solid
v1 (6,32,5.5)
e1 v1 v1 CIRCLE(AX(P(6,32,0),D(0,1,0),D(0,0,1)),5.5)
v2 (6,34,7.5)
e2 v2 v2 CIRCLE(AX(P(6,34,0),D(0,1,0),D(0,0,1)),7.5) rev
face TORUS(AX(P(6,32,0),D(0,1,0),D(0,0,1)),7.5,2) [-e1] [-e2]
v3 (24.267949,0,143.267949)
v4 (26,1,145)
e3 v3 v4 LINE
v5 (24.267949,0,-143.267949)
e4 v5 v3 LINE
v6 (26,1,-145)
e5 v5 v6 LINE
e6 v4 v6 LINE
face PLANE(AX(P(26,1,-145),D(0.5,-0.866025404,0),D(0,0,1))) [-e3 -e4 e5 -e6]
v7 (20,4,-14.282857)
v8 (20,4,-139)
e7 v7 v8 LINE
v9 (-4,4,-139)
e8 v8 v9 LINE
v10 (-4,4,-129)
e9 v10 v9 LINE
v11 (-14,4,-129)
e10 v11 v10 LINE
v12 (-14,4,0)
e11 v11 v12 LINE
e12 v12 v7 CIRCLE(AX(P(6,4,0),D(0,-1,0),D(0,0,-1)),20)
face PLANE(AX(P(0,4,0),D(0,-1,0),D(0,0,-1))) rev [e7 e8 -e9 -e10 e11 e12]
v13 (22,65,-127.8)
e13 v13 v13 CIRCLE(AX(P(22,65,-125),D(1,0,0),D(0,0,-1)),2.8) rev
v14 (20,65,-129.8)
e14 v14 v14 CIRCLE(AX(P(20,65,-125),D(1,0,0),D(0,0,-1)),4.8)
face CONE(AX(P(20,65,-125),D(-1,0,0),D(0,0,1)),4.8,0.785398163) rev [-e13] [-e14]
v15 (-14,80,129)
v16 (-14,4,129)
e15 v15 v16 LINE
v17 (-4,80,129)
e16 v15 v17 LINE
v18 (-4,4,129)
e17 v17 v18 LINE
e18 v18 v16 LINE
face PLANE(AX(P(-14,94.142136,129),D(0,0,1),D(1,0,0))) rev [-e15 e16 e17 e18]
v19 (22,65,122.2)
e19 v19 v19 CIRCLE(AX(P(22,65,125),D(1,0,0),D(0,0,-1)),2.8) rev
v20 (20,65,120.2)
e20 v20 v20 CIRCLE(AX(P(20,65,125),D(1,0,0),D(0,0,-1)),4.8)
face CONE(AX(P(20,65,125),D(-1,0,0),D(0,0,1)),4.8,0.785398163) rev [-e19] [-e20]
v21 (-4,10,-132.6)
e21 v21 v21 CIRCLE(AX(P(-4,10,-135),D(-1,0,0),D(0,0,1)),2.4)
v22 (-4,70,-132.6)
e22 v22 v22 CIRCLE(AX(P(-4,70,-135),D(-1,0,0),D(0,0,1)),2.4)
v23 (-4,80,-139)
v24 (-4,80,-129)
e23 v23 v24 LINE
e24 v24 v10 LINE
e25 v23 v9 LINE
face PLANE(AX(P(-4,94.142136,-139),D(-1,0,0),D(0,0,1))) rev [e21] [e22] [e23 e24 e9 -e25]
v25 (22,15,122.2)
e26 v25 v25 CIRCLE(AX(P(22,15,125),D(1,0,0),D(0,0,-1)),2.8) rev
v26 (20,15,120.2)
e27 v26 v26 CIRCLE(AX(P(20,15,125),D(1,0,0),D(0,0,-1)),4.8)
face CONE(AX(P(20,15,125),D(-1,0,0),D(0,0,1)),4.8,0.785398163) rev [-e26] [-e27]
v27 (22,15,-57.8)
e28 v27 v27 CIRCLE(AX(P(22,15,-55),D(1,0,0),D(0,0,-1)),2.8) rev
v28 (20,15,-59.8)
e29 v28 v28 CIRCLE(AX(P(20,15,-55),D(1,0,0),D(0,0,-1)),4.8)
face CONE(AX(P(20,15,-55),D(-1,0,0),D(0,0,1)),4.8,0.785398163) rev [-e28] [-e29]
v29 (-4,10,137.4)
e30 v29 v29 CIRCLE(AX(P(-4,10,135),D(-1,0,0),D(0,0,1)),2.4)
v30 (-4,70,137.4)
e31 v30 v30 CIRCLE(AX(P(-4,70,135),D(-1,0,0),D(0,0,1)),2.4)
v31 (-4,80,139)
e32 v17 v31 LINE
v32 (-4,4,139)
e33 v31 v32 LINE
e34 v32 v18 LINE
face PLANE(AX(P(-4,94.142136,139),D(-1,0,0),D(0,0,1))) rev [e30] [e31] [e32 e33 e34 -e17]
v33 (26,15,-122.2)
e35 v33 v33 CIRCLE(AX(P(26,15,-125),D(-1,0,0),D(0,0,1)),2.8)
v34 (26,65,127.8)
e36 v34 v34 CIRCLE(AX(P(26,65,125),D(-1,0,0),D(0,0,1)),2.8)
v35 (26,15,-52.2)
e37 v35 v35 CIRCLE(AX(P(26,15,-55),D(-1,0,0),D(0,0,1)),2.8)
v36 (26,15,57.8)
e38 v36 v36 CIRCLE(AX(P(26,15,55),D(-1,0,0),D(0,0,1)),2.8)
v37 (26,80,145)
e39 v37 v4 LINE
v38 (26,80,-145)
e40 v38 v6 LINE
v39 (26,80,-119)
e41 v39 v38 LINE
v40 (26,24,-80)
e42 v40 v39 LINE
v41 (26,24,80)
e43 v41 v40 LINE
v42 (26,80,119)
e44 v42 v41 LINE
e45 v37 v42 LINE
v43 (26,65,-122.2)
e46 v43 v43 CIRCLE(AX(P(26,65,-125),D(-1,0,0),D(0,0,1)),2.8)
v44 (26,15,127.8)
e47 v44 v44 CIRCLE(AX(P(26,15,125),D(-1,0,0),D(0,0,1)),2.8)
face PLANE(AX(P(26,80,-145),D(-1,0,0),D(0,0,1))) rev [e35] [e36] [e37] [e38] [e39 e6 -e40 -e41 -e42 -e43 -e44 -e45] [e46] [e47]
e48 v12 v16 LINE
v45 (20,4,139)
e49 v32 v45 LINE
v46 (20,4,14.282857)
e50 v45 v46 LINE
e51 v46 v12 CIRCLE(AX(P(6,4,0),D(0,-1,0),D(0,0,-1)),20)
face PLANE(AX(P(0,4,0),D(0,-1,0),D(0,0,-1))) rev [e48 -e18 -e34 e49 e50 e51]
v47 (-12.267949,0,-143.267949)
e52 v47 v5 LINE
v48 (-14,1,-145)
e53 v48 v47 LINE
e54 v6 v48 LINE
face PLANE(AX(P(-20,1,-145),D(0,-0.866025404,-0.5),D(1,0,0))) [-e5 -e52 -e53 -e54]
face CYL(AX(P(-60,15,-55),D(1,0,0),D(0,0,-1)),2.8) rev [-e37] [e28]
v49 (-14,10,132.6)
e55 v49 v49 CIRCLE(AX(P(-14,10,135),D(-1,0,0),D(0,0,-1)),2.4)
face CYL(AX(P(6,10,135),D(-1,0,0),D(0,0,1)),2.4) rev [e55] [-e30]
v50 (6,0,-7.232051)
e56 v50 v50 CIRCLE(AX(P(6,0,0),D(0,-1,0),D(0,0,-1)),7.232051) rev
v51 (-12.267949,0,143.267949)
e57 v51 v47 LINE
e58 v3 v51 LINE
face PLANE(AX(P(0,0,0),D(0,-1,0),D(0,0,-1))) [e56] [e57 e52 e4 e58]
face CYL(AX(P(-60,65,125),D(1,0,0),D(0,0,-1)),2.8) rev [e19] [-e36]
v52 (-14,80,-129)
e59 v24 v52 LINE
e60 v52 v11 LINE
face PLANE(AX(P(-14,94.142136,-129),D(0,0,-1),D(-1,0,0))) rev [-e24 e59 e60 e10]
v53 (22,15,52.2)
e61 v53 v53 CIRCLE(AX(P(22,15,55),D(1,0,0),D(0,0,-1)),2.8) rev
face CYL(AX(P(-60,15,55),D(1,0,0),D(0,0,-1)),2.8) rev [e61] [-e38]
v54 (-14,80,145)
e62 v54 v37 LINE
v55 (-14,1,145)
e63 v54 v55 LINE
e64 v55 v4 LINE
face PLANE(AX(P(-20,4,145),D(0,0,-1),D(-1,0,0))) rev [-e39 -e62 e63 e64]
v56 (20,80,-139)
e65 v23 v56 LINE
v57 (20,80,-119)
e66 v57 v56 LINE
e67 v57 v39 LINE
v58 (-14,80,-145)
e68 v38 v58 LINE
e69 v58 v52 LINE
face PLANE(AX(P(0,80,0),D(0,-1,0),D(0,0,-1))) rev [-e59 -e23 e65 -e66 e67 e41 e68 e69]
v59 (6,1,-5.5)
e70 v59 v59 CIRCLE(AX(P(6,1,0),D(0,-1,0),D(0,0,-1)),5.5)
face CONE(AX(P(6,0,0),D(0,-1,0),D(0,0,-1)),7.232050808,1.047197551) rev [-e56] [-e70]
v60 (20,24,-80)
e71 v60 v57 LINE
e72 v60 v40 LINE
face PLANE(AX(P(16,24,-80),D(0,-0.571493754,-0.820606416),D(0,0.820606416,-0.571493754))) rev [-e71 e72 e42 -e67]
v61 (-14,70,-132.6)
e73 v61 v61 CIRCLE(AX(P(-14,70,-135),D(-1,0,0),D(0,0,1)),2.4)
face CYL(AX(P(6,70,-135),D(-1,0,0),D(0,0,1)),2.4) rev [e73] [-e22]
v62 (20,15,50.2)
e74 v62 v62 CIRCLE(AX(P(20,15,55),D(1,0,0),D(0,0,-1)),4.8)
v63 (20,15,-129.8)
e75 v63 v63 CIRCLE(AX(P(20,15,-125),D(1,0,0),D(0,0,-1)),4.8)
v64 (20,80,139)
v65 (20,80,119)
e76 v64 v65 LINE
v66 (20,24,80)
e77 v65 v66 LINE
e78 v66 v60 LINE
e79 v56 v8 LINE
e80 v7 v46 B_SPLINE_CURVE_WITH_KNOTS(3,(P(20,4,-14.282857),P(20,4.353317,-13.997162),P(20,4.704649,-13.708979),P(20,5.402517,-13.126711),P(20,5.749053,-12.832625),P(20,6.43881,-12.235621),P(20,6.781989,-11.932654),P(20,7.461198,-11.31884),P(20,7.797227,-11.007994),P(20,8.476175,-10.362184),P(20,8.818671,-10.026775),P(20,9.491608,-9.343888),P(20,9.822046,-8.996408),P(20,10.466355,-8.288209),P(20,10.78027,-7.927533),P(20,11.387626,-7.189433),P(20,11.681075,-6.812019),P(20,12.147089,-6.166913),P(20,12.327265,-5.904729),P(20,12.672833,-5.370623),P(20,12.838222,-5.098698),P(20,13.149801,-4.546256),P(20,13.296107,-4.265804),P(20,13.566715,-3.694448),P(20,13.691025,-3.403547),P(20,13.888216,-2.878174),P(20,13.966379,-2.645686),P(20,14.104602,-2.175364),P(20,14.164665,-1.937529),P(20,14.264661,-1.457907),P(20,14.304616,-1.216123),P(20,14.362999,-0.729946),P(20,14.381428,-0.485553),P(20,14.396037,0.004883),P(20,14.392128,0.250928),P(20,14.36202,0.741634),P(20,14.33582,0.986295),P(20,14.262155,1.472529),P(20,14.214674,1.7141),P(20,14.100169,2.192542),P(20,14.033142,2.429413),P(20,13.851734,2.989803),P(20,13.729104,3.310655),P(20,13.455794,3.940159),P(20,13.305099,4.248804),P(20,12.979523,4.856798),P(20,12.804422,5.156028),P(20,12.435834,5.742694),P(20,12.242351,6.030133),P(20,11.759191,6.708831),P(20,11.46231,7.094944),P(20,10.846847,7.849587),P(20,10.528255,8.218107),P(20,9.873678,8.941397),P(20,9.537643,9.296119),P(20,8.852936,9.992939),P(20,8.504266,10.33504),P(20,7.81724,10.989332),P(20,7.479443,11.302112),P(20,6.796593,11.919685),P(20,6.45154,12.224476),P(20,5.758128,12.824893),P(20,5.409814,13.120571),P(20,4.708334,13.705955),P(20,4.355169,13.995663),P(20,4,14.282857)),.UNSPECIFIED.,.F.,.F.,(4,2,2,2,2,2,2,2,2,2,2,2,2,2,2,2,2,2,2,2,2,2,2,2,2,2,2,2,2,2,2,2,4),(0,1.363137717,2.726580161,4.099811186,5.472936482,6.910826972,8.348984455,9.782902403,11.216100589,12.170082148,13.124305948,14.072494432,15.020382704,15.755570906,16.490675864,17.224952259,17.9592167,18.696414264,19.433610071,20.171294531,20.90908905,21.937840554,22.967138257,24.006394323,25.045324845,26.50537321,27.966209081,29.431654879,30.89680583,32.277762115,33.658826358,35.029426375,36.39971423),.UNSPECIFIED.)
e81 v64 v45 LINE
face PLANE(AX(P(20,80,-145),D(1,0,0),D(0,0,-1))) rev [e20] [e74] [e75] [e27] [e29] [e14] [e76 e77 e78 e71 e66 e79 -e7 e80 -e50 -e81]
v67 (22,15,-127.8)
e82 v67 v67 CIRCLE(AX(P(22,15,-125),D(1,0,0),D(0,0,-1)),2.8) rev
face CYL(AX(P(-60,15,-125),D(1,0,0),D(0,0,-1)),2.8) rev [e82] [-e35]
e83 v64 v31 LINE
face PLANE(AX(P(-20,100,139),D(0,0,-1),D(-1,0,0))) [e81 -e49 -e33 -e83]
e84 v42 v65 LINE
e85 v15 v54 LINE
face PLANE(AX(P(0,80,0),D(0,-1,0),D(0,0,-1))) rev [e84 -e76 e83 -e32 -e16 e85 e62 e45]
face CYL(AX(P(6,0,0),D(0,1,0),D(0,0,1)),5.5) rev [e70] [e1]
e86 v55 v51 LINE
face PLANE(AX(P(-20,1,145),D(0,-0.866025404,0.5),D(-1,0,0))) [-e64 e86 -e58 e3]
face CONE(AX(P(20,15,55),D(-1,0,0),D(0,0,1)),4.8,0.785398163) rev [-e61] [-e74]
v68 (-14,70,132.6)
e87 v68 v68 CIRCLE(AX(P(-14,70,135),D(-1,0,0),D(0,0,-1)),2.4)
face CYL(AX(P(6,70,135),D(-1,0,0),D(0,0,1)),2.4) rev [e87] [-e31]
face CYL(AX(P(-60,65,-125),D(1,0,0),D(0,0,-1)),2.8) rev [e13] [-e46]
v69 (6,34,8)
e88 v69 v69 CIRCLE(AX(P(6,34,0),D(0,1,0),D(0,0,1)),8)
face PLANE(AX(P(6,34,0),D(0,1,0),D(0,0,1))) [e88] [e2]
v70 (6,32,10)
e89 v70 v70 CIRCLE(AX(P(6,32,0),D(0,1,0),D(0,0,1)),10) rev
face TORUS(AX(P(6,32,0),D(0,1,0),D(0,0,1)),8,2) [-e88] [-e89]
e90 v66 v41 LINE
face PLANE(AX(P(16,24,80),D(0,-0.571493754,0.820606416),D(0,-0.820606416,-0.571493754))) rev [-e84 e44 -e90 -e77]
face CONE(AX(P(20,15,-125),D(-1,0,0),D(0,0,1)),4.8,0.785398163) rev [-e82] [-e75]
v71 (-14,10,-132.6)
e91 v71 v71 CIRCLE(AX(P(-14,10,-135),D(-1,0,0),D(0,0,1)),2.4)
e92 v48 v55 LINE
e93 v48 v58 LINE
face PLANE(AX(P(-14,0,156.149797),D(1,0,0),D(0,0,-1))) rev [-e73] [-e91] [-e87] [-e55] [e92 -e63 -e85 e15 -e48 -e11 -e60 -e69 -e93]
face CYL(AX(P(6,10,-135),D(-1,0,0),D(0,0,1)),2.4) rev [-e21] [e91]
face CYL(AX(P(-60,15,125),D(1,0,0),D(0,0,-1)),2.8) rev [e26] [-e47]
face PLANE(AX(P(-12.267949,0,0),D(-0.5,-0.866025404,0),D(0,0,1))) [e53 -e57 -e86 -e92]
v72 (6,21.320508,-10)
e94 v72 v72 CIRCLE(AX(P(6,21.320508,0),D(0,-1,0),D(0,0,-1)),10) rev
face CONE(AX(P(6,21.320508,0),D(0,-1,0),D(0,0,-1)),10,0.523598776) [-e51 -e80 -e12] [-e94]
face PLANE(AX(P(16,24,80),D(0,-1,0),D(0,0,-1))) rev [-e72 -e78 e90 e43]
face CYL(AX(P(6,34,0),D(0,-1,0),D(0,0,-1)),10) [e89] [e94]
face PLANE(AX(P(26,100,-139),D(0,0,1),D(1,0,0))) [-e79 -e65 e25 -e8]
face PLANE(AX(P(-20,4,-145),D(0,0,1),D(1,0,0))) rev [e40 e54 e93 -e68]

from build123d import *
from OCP.BRepFilletAPI import BRepFilletAPI_MakeChamfer

# Parameters (mm, degrees)
EXTRUDE_1_DEPTH           = 4
SKETCH_2_W                = 6
SKETCH_2_H                = 290
EXTRUDE_2_DEPTH           = 80
EXTRUDE_1_2_DEPTH         = 96
SKETCH_29_W               = 8
SKETCH_29_H               = 100
EXTRUDE_5_DEPTH           = 96
SKETCH_20_W               = 6
SKETCH_20_H               = 7.125217771
SKETCH_20_W_2             = 7.125217771
SKETCH_20_H_2             = 6
SKETCH_20_H_3             = 7.251760651
SKETCH_20_W_3             = 7.251760651
CUT_EXTRUDE_7_DEPTH       = 2
CUT_EXTRUDE_6_DEPTH       = 197.012754687
CUT_EXTRUDE_6_DEPTH_BACK  = 197.012754687
SKETCH_16_R               = 2.8
SKETCH_21_R               = 2
LED_DEPTH                 = 10
SKETCH_22_W               = 46
SKETCH_22_H               = 290
CUT_EXTRUDE_9_DEPTH       = 20
FILLET_3_R                = 30
SKETCH_23_W               = 30
SKETCH_23_H               = 6
EXTRUDE_3_DEPTH           = 10
SKETCH_24_W               = 30
SKETCH_24_H               = 6
EXTRUDE_4_DEPTH           = 10
CHAMFER_1_SIZE            = 10
CUT_EXTRUDE_10_DEPTH      = 10
CHAMFER_2_SIZE            = 2
SKETCH_30_R               = 1.9
CUT_EXTRUDE_11_DEPTH      = 7
SKETCH_32_R               = 1.9
CUT_EXTRUDE_13_DEPTH      = 7
CHAMFER_3_SIZE            = 2
CHAMFER_4_SIZE            = 2
CHAMFER_5_SIZE            = 2
SKETCH_33_R               = 10
EXTRUDE_6_DEPTH           = 30
CHAMFER_6_SIZE            = 10
CHAMFER_6_SIZE_2          = 17.320508076
CUT_EXTRUDE_14_DEPTH      = 171.238068672
CUT_EXTRUDE_14_DEPTH_BACK = 171.238068672
SKETCH_34_R               = 5.5
FILLET_4_R                = 2
CUT_EXTRUDE_15_DEPTH      = 187.077940745
CUT_EXTRUDE_15_DEPTH_BACK = 187.077940745
SKETCH_35_W               = 74.138767557
SKETCH_35_H               = 312.299593446
SKETCH_36_W               = 10
SKETCH_36_H               = 10
EXTRUDE_7_DEPTH           = 76
SKETCH_37_R               = 2.4
CUT_EXTRUDE_16_DEPTH      = 20
CHAMFER_7_SIZE            = 1
CHAMFER_7_SIZE2           = 1.732050808


# Some blends are built 0.0001 mm under size
with BuildPart() as part:
    # Эскиз1 → Extrude 1 (new body)
    with BuildSketch(Plane(origin=(0, 0, 0), x_dir=(1, 0, 0), z_dir=(0, 1, 0))):
        Polygon((-60, -50), (-60, 50), (-20, 145), (20, 145), (20, -145), (-20, -145), align=None)
    extrude(amount=EXTRUDE_1_DEPTH)

    # Эскиз2 → Бобышка-Вытянуть2 (add)
    with BuildSketch(Plane(origin=(0, 0, 0), x_dir=(1, 0, 0), z_dir=(0, 1, 0))):
        with Locations((23, 0)):
            Rectangle(SKETCH_2_W, SKETCH_2_H)
    extrude(amount=EXTRUDE_2_DEPTH)

    # Эскиз17 → Extrude 1 2 (add)
    with BuildSketch(Plane(origin=(0, 4, 0), x_dir=(1, 0, 0), z_dir=(0, 1, 0))):
        Polygon((-20, 145), (-60, 50), (-60, -50), (-20, -145), (26, -145), (26, 145), align=None)
        Polygon((-16.016149012, 139), (-54, 48.788353904), (-54, -48.788353904), (-16.016149012, -139), (20, -139), (20, 139), align=None, mode=Mode.SUBTRACT)
    extrude(amount=EXTRUDE_1_2_DEPTH)

    # Эскиз29 → Бобышка-Вытянуть5 (add)
    with BuildSketch(Plane(origin=(0, 100, 0), x_dir=(1, 0, 0), z_dir=(0, 1, 0))):
        with Locations((-56, 0)):
            Rectangle(SKETCH_29_W, SKETCH_29_H)
    extrude(amount=-EXTRUDE_5_DEPTH)

    # Эскиз20 → Вырез-Вытянуть7 (cut)
    with BuildSketch(Plane(origin=(-52, 0, 0), x_dir=(0, 0, -1), z_dir=(1, 0, 0))):
        Polygon((8.231441461, 94.311267666), (6.387299401, 87.428835803), (12.182854359, 85.875921532), (14.026996418, 92.758353395), align=None)
        with BuildLine():
            Line((6.3, 52), (12.161242978, 57.861242978))
            ThreePointArc((12.161242978, 57.861242978), (0, 65.5), (-12.161242978, 57.861242978))
            Line((-12.161242978, 57.861242978), (-6.3, 52))
            Line((-6.3, 52), (-12.161242978, 46.138757022))
            ThreePointArc((-12.161242978, 46.138757022), (0, 38.5), (12.161242978, 46.138757022))
            Line((12.161242978, 46.138757022), (6.3, 52))
        make_face()
        with Locations((0, 91.437391115)):
            Rectangle(SKETCH_20_W, SKETCH_20_H)
        Polygon((18.901923789, 90.739092363), (15.339314903, 84.568472766), (20.535467326, 81.568472766), (24.098076211, 87.739092363), align=None)
        Polygon((28.284271247, 84.526911935), (23.245981444, 79.488622131), (27.488622131, 75.245981444), (32.526911935, 80.284271247), align=None)
        Polygon((35.739092363, 76.098076211), (29.568472766, 72.535467326), (32.568472766, 67.339314903), (38.739092363, 70.901923789), align=None)
        Polygon((40.758353395, 66.026996418), (33.875921532, 64.182854359), (35.428835803, 58.387299401), (42.311267666, 60.231441461), align=None)
        with Locations((39.437391115, 52)):
            Rectangle(SKETCH_20_W_2, SKETCH_20_H_2)
        Polygon((42.311267666, 43.768558539), (35.428835803, 45.612700599), (33.875921532, 39.817145641), (40.758353395, 37.973003582), align=None)
        Polygon((38.739092363, 33.098076211), (32.568472766, 36.660685097), (29.568472766, 31.464532674), (35.739092363, 27.901923789), align=None)
        Polygon((32.526911935, 23.715728753), (27.488622131, 28.754018556), (23.245981444, 24.511377869), (28.284271247, 19.473088065), align=None)
        Polygon((24.098076211, 16.260907637), (20.535467326, 22.431527234), (15.339314903, 19.431527234), (18.901923789, 13.260907637), align=None)
        Polygon((14.026996418, 11.241646605), (12.182854359, 18.124078468), (6.387299401, 16.571164197), (8.231441461, 9.688732334), align=None)
        with Locations((0, 12.562608886)):
            Rectangle(SKETCH_20_W, SKETCH_20_H)
        Polygon((-8.231441461, 9.688732334), (-6.387299401, 16.571164197), (-12.182854359, 18.124078468), (-14.026996418, 11.241646605), align=None)
        Polygon((-18.901923789, 13.260907637), (-15.339314903, 19.431527234), (-20.535467326, 22.431527234), (-24.098076211, 16.260907637), align=None)
        Polygon((-28.284271247, 19.473088065), (-23.245981444, 24.511377869), (-27.488622131, 28.754018556), (-32.526911935, 23.715728753), align=None)
        Polygon((-35.739092363, 27.901923789), (-29.568472766, 31.464532674), (-32.568472766, 36.660685097), (-38.739092363, 33.098076211), align=None)
        Polygon((-40.758353395, 37.973003582), (-33.875921532, 39.817145641), (-35.428835803, 45.612700599), (-42.311267666, 43.768558539), align=None)
        with Locations((-39.437391115, 52)):
            Rectangle(SKETCH_20_W_2, SKETCH_20_H_2)
        Polygon((-42.311267666, 60.231441461), (-35.428835803, 58.387299401), (-33.875921532, 64.182854359), (-40.758353395, 66.026996418), align=None)
        Polygon((-38.739092363, 70.901923789), (-32.568472766, 67.339314903), (-29.568472766, 72.535467326), (-35.739092363, 76.098076211), align=None)
        Polygon((-32.526911935, 80.284271247), (-27.488622131, 75.245981444), (-23.245981444, 79.488622131), (-28.284271247, 84.526911935), align=None)
        Polygon((-24.098076211, 87.739092363), (-20.535467326, 81.568472766), (-15.339314903, 84.568472766), (-18.901923789, 90.739092363), align=None)
        Polygon((-14.026996418, 92.758353395), (-12.182854359, 85.875921532), (-6.387299401, 87.428835803), (-8.231441461, 94.311267666), align=None)
        Polygon((6.276043463, 68.870426149), (9.901923789, 75.150635095), (15.098076211, 72.150635095), (11.472195886, 65.870426149), align=None)
        with Locations((0, 73.374119675)):
            Rectangle(SKETCH_20_W, SKETCH_20_H_3)
        Polygon((13.870426149, 63.472195886), (20.150635095, 67.098076211), (23.150635095, 61.901923789), (16.870426149, 58.276043463), align=None)
        with Locations((21.374119675, 52)):
            Rectangle(SKETCH_20_W_3, SKETCH_20_H_2)
        Polygon((16.870426149, 45.723956537), (23.150635095, 42.098076211), (20.150635095, 36.901923789), (13.870426149, 40.527804114), align=None)
        Polygon((11.472195886, 38.129573851), (15.098076211, 31.849364905), (9.901923789, 28.849364905), (6.276043463, 35.129573851), align=None)
        with Locations((0, 30.625880326)):
            Rectangle(SKETCH_20_W, SKETCH_20_H_3)
        Polygon((-6.276043463, 35.129573851), (-9.901923789, 28.849364905), (-15.098076211, 31.849364905), (-11.472195886, 38.129573851), align=None)
        Polygon((-13.870426149, 40.527804114), (-20.150635095, 36.901923789), (-23.150635095, 42.098076211), (-16.870426149, 45.723956537), align=None)
        with Locations((-21.374119675, 52)):
            Rectangle(SKETCH_20_W_3, SKETCH_20_H_2)
        Polygon((-16.870426149, 58.276043463), (-23.150635095, 61.901923789), (-20.150635095, 67.098076211), (-13.870426149, 63.472195886), align=None)
        Polygon((-11.472195886, 65.870426149), (-15.098076211, 72.150635095), (-9.901923789, 75.150635095), (-6.276043463, 68.870426149), align=None)
    extrude(amount=-CUT_EXTRUDE_7_DEPTH, mode=Mode.SUBTRACT)

    # Эскиз16 → Вырез-Вытянуть6 (cut, two sides: drawn at the far end of the back side and taken through both)
    with BuildSketch(Plane(origin=(26, 0, 0), x_dir=(0, 0, -1), z_dir=(1, 0, 0)).offset(-CUT_EXTRUDE_6_DEPTH_BACK)):
        with Locations((125, 65)):
            Circle(SKETCH_16_R)
        with Locations((-125, 65)):
            Circle(SKETCH_16_R)
        with Locations((-125, 15)):
            Circle(SKETCH_16_R)
        with Locations((125, 15)):
            Circle(SKETCH_16_R)
        with Locations((55, 15)):
            Circle(SKETCH_16_R)
        with Locations((-55, 15)):
            Circle(SKETCH_16_R)
    extrude(amount=CUT_EXTRUDE_6_DEPTH + CUT_EXTRUDE_6_DEPTH_BACK, mode=Mode.SUBTRACT)

    # Эскиз21 → Отверстия под LED (cut)
    with BuildSketch(Plane(origin=(-52, 0, 0), x_dir=(0, 0, -1), z_dir=(1, 0, 0))):
        with Locations((0, 90.5)):
            Circle(SKETCH_21_R)
        with Locations((9.964533236, 89.188144312)):
            Circle(SKETCH_21_R)
        with Locations((19.25, 85.341978046)):
            Circle(SKETCH_21_R)
        with Locations((27.223611076, 79.223611076)):
            Circle(SKETCH_21_R)
        with Locations((33.341978046, 71.25)):
            Circle(SKETCH_21_R)
        with Locations((37.188144312, 61.964533236)):
            Circle(SKETCH_21_R)
        with Locations((38.5, 52)):
            Circle(SKETCH_21_R)
        with Locations((37.188144312, 42.035466764)):
            Circle(SKETCH_21_R)
        with Locations((33.341978046, 32.75)):
            Circle(SKETCH_21_R)
        with Locations((27.223611076, 24.776388924)):
            Circle(SKETCH_21_R)
        with Locations((19.25, 18.658021954)):
            Circle(SKETCH_21_R)
        with Locations((9.964533236, 14.811855688)):
            Circle(SKETCH_21_R)
        with Locations((0, 13.5)):
            Circle(SKETCH_21_R)
        with Locations((-9.964533236, 14.811855688)):
            Circle(SKETCH_21_R)
        with Locations((-19.25, 18.658021954)):
            Circle(SKETCH_21_R)
        with Locations((-27.223611076, 24.776388924)):
            Circle(SKETCH_21_R)
        with Locations((-33.341978046, 32.75)):
            Circle(SKETCH_21_R)
        with Locations((-37.188144312, 42.035466764)):
            Circle(SKETCH_21_R)
        with Locations((-38.5, 52)):
            Circle(SKETCH_21_R)
        with Locations((-37.188144312, 61.964533236)):
            Circle(SKETCH_21_R)
        with Locations((-33.341978046, 71.25)):
            Circle(SKETCH_21_R)
        with Locations((-27.223611076, 79.223611076)):
            Circle(SKETCH_21_R)
        with Locations((-19.25, 85.341978046)):
            Circle(SKETCH_21_R)
        with Locations((-9.964533236, 89.188144312)):
            Circle(SKETCH_21_R)
        with Locations((0, 73)):
            Circle(SKETCH_21_R)
        with Locations((10.5, 70.186533479)):
            Circle(SKETCH_21_R)
        with Locations((18.186533479, 62.5)):
            Circle(SKETCH_21_R)
        with Locations((21, 52)):
            Circle(SKETCH_21_R)
        with Locations((18.186533479, 41.5)):
            Circle(SKETCH_21_R)
        with Locations((10.5, 33.813466521)):
            Circle(SKETCH_21_R)
        with Locations((0, 31)):
            Circle(SKETCH_21_R)
        with Locations((-10.5, 33.813466521)):
            Circle(SKETCH_21_R)
        with Locations((-18.186533479, 41.5)):
            Circle(SKETCH_21_R)
        with Locations((-21, 52)):
            Circle(SKETCH_21_R)
        with Locations((-18.186533479, 62.5)):
            Circle(SKETCH_21_R)
        with Locations((-10.5, 70.186533479)):
            Circle(SKETCH_21_R)
        with Locations((0, 60.3)):
            Circle(SKETCH_21_R)
        with Locations((7.188010851, 56.15)):
            Circle(SKETCH_21_R)
        with Locations((7.188010851, 47.85)):
            Circle(SKETCH_21_R)
        with Locations((0, 43.7)):
            Circle(SKETCH_21_R)
        with Locations((-7.188010851, 47.85)):
            Circle(SKETCH_21_R)
        with Locations((-7.188010851, 56.15)):
            Circle(SKETCH_21_R)
        with Locations((0, 52)):
            Circle(SKETCH_21_R)
    extrude(amount=-LED_DEPTH, mode=Mode.SUBTRACT)

    # Эскиз22 → Вырез-Вытянуть9 (cut)
    with BuildSketch(Plane(origin=(0, 100, 0), x_dir=(1, 0, 0), z_dir=(0, 1, 0))):
        with Locations((3, 0)):
            Rectangle(SKETCH_22_W, SKETCH_22_H)
    extrude(amount=-CUT_EXTRUDE_9_DEPTH, mode=Mode.SUBTRACT)

    # Скругление3
    # the kernel refuses this fillet: 30 mm, written as the material it takes off along each edge
    with BuildSketch(Plane(origin=(-60, -15.145576201, 50), x_dir=(0, 0, -1), z_dir=(0, 1, 0)), Plane(origin=(-60, 115.145576201, -50), x_dir=(0, 0, 1), z_dir=(0, -1, 0))) as fillet_3_piece_1:
        with BuildLine():
            CenterArc((FILLET_3_R * 0.201941016011, -FILLET_3_R), FILLET_3_R, 90, 22.833654178)
            Line((-FILLET_3_R * 0.186115984047, -FILLET_3_R * 0.0783646248619), (0, 0))
            Line((0, 0), (FILLET_3_R * 0.201941016011, 0))
        make_face()
    extrude(amount=130.291152402, mode=Mode.SUBTRACT)

    # Эскиз23 → Бобышка-Вытянуть3 (add)
    with BuildSketch(Plane(origin=(-63.317246573, 0, -26.659893294), x_dir=(0.38805700005813276, 0, -0.9216353751380653), z_dir=(0.9216353751380653, 0, 0.38805700005813276))):
        with Locations((55.902804754, 97)):
            Rectangle(SKETCH_23_W, SKETCH_23_H)
    extrude(amount=EXTRUDE_3_DEPTH)

    # Эскиз24 → Бобышка-Вытянуть4 (add)
    with BuildSketch(Plane(origin=(-63.317246573, 0, 26.659893294), x_dir=(-0.3880570000581327, 0, -0.9216353751380654), z_dir=(0.9216353751380654, 0, -0.3880570000581327))):
        with Locations((-55.902804754, 97)):
            Rectangle(SKETCH_24_W, SKETCH_24_H)
    extrude(amount=EXTRUDE_4_DEPTH)

    # Фаска1
    chamfer_1_edges = [part.edges().sort_by_distance(p)[0] for p in [
        (-41.623771865, 94, -78.181895724),
        (-41.623771865, 94, 78.181895724),
    ]]
    chamfer(chamfer_1_edges, length=CHAMFER_1_SIZE - 0.0001)  # a hair under: the kernel refuses the full size

    # Эскиз27 → Вырез-Вытянуть10 (cut)
    with BuildSketch(Plane(origin=(26, 0, 0), x_dir=(0, 0, -1), z_dir=(1, 0, 0))):
        Polygon((-80, 24), (80, 24), (119, 80), (-119, 80), align=None)
    extrude(amount=-CUT_EXTRUDE_10_DEPTH, mode=Mode.SUBTRACT)

    # Фаска2
    chamfer_2_edges = [part.edges().sort_by_distance(p)[0] for p in [
        (-60, 32.75, 35.341978046),
        (-60, 42.035466764, 39.188144312),
        (-60, 52, 40.5),
        (-60, 61.964533236, 39.188144312),
        (-60, 71.25, 35.341978046),
        (-60, 79.223611076, 29.223611076),
        (-60, 85.341978046, 21.25),
        (-60, 89.188144312, 11.964533236),
        (-60, 24.776388924, 29.223611076),
        (-60, 18.658021954, 21.25),
        (-60, 14.811855688, 11.964533236),
        (-60, 13.5, 2),
        (-60, 14.811855688, -7.964533236),
        (-60, 18.658021954, -17.25),
        (-60, 24.776388924, -25.223611076),
        (-60, 32.75, -31.341978046),
        (-60, 42.035466764, -35.188144312),
        (-60, 52, -36.5),
        (-60, 61.964533236, -35.188144312),
        (-60, 71.25, -31.341978046),
        (-60, 79.223611076, -25.223611076),
        (-60, 85.341978046, -17.25),
        (-60, 89.188144312, -7.964533236),
        (-60, 90.5, 2),
    ]]
    chamfer(chamfer_2_edges, length=CHAMFER_2_SIZE)

    # Эскиз30 → Вырез-Вытянуть11 (cut)
    with BuildSketch(Plane(origin=(-52, 0, 0), x_dir=(0, 0, -1), z_dir=(1, 0, 0))):
        with Locations((-40, 92)):
            Circle(SKETCH_30_R)
        with Locations((40, 92)):
            Circle(SKETCH_30_R)
        with Locations((-40, 12)):
            Circle(SKETCH_30_R)
        with Locations((40, 12)):
            Circle(SKETCH_30_R)
    extrude(amount=-CUT_EXTRUDE_11_DEPTH, mode=Mode.SUBTRACT)

    # Эскиз32 → Вырез-Вытянуть13 (cut)
    with BuildSketch(Plane(origin=(0, 100, 0), x_dir=(1, 0, 0), z_dir=(0, 1, 0))):
        with Locations(Location((-38, 77.261926747, 0), (0, 0, 270))):
            Circle(SKETCH_32_R)
        with Locations(Location((-38, -77.261926747, 0), (0, 0, 90))):
            Circle(SKETCH_32_R)
    extrude(amount=-CUT_EXTRUDE_13_DEPTH, mode=Mode.SUBTRACT)

    # Фаска3
    chamfer_3_edges = [part.edges().sort_by_distance(p)[0] for p in [
        (-60, 60.3, 2),
        (-60, 56.15, 9.188010851),
        (-60, 47.85, 9.188010851),
        (-60, 43.7, 2),
        (-60, 47.85, -5.188010851),
        (-60, 56.15, -5.188010851),
        (-60, 52, 2),
    ]]
    chamfer(chamfer_3_edges, length=CHAMFER_3_SIZE)

    # Фаска4
    chamfer_4_edges = [part.edges().sort_by_distance(p)[0] for p in [
        (-60, 70.186533479, -8.5),
        (-60, 62.5, -16.186533479),
        (-60, 52, -19),
        (-60, 41.5, -16.186533479),
        (-60, 33.813466521, -8.5),
        (-60, 31, 2),
        (-60, 33.813466521, 12.5),
        (-60, 73, 2),
        (-60, 70.186533479, 12.5),
        (-60, 62.5, 20.186533479),
        (-60, 52, 23),
        (-60, 41.5, 20.186533479),
    ]]
    chamfer(chamfer_4_edges, length=CHAMFER_4_SIZE)

    # Фаска5
    chamfer_5_edges = [part.edges().sort_by_distance(p)[0] for p in [
        (20, 65, 127.8),
        (20, 15, 127.8),
        (20, 15, -122.2),
        (20, 15, -52.2),
        (20, 15, 57.8),
        (20, 65, -122.2),
    ]]
    chamfer(chamfer_5_edges, length=CHAMFER_5_SIZE)

    # Эскиз33 → Бобышка-Вытянуть6 (add)
    with BuildSketch(Plane(origin=(0, 4, 0), x_dir=(1, 0, 0), z_dir=(0, 1, 0))):
        with Locations(Location((6, 0, 0), (0, 0, 90))):
            Circle(SKETCH_33_R)
    extrude(amount=EXTRUDE_6_DEPTH)

    # Фаска6
    # the kernel refuses this chamfer: 17.320508076, 10 mm, written as the material it adds along each edge
    with BuildSketch(Plane(origin=(6, 4, 0), x_dir=(0, 0, -1), z_dir=(1, 0, 0))) as chamfer_6_piece_1:
        Polygon((10 + CHAMFER_6_SIZE, 0), (10, CHAMFER_6_SIZE_2), (10, 0), align=None)
    revolve(axis=Axis((6, 4, 0), (0, 1, 0)))

    # Эскиз34 → Вырез-Вытянуть14 (cut, two sides: drawn at the far end of the back side and taken through both)
    with BuildSketch(Plane(origin=(0, 34, 0), x_dir=(1, 0, 0), z_dir=(0, 1, 0)).offset(-CUT_EXTRUDE_14_DEPTH_BACK)):
        with Locations(Location((6, 0, 0), (0, 0, 270))):
            Circle(SKETCH_34_R)
    extrude(amount=CUT_EXTRUDE_14_DEPTH + CUT_EXTRUDE_14_DEPTH_BACK, mode=Mode.SUBTRACT)

    # Скругление4
    fillet_4_edges = [part.edges().sort_by_distance(p)[0] for p in [
        (6, 34, 10),
        (6, 34, -5.5),
    ]]
    fillet(fillet_4_edges, radius=FILLET_4_R)

    # Эскиз35 → Вырез-Вытянуть15 (cut, two sides: drawn at the far end of the back side and taken through both)
    with BuildSketch(Plane(origin=(0, 100, 0), x_dir=(1, 0, 0), z_dir=(0, 1, 0)).offset(-CUT_EXTRUDE_15_DEPTH_BACK)):
        with Locations((-51.069383779, 0)):
            Rectangle(SKETCH_35_W, SKETCH_35_H)
    extrude(amount=CUT_EXTRUDE_15_DEPTH + CUT_EXTRUDE_15_DEPTH_BACK, mode=Mode.SUBTRACT)

    # Эскиз36 → Бобышка-Вытянуть7 (add)
    with BuildSketch(Plane(origin=(0, 4, 0), x_dir=(1, 0, 0), z_dir=(0, 1, 0))):
        with Locations((-9, 134)):
            Rectangle(SKETCH_36_W, SKETCH_36_H)
        with Locations((-9, -134)):
            Rectangle(SKETCH_36_W, SKETCH_36_H)
    extrude(amount=EXTRUDE_7_DEPTH)

    # Эскиз37 → Вырез-Вытянуть16 (cut)
    with BuildSketch(Plane.ZY.offset(14)):
        with Locations((-135, 70)):
            Circle(SKETCH_37_R)
        with Locations((-135, 10)):
            Circle(SKETCH_37_R)
        with Locations((135, 10)):
            Circle(SKETCH_37_R)
        with Locations((135, 70)):
            Circle(SKETCH_37_R)
    extrude(amount=-CUT_EXTRUDE_16_DEPTH, mode=Mode.SUBTRACT)

    # Фаска7: one chamfer whose edges measure the first distance from different faces: ONE call of the kernel's chamfer builder (chamfer() names one face for all edges)
    chamfer_7_edges_1 = [part.edges().sort_by_distance(p)[0] for p in [
        (6, 0, -5.5),
    ]]
    chamfer_7_side_1 = [part.faces().sort_by_distance(p)[0] for p in [
        (6, 16, -5.5),
    ]]
    chamfer_7_edges_2 = [part.edges().sort_by_distance(p)[0] for p in [
        (6, 0, 145),
    ]]
    chamfer_7_side_2 = [part.faces().sort_by_distance(p)[0] for p in [
        (6, 40, 145),
    ]]
    chamfer_7_edges_3 = [part.edges().sort_by_distance(p)[0] for p in [
        (-14, 0, 0),
    ]]
    chamfer_7_side_3 = [part.faces().sort_by_distance(p)[0] for p in [
        (-14, 76.991678209, 137),
    ]]
    chamfer_7_edges_4 = [part.edges().sort_by_distance(p)[0] for p in [
        (26, 0, 0),
    ]]
    chamfer_7_side_4 = [part.faces().sort_by_distance(p)[0] for p in [
        (26, 3.008321791, 0),
    ]]
    chamfer_7_edges_5 = [part.edges().sort_by_distance(p)[0] for p in [
        (6, 0, -145),
    ]]
    chamfer_7_side_5 = [part.faces().sort_by_distance(p)[0] for p in [
        (6, 40, -145),
    ]]
    chamfer_7 = BRepFilletAPI_MakeChamfer(part.part.solid().wrapped)
    for e in chamfer_7_edges_1:
        chamfer_7.Add(CHAMFER_7_SIZE, CHAMFER_7_SIZE2, e.wrapped, chamfer_7_side_1[0].wrapped)  # the first distance lies on this face
    for e in chamfer_7_edges_2:
        chamfer_7.Add(CHAMFER_7_SIZE, CHAMFER_7_SIZE2, e.wrapped, chamfer_7_side_2[0].wrapped)  # the first distance lies on this face
    for e in chamfer_7_edges_3:
        chamfer_7.Add(CHAMFER_7_SIZE, CHAMFER_7_SIZE2, e.wrapped, chamfer_7_side_3[0].wrapped)  # the first distance lies on this face
    for e in chamfer_7_edges_4:
        chamfer_7.Add(CHAMFER_7_SIZE, CHAMFER_7_SIZE2, e.wrapped, chamfer_7_side_4[0].wrapped)  # the first distance lies on this face
    for e in chamfer_7_edges_5:
        chamfer_7.Add(CHAMFER_7_SIZE, CHAMFER_7_SIZE2, e.wrapped, chamfer_7_side_5[0].wrapped)  # the first distance lies on this face
    add(Compound.cast(chamfer_7.Shape()), mode=Mode.REPLACE)


solid = part.part
